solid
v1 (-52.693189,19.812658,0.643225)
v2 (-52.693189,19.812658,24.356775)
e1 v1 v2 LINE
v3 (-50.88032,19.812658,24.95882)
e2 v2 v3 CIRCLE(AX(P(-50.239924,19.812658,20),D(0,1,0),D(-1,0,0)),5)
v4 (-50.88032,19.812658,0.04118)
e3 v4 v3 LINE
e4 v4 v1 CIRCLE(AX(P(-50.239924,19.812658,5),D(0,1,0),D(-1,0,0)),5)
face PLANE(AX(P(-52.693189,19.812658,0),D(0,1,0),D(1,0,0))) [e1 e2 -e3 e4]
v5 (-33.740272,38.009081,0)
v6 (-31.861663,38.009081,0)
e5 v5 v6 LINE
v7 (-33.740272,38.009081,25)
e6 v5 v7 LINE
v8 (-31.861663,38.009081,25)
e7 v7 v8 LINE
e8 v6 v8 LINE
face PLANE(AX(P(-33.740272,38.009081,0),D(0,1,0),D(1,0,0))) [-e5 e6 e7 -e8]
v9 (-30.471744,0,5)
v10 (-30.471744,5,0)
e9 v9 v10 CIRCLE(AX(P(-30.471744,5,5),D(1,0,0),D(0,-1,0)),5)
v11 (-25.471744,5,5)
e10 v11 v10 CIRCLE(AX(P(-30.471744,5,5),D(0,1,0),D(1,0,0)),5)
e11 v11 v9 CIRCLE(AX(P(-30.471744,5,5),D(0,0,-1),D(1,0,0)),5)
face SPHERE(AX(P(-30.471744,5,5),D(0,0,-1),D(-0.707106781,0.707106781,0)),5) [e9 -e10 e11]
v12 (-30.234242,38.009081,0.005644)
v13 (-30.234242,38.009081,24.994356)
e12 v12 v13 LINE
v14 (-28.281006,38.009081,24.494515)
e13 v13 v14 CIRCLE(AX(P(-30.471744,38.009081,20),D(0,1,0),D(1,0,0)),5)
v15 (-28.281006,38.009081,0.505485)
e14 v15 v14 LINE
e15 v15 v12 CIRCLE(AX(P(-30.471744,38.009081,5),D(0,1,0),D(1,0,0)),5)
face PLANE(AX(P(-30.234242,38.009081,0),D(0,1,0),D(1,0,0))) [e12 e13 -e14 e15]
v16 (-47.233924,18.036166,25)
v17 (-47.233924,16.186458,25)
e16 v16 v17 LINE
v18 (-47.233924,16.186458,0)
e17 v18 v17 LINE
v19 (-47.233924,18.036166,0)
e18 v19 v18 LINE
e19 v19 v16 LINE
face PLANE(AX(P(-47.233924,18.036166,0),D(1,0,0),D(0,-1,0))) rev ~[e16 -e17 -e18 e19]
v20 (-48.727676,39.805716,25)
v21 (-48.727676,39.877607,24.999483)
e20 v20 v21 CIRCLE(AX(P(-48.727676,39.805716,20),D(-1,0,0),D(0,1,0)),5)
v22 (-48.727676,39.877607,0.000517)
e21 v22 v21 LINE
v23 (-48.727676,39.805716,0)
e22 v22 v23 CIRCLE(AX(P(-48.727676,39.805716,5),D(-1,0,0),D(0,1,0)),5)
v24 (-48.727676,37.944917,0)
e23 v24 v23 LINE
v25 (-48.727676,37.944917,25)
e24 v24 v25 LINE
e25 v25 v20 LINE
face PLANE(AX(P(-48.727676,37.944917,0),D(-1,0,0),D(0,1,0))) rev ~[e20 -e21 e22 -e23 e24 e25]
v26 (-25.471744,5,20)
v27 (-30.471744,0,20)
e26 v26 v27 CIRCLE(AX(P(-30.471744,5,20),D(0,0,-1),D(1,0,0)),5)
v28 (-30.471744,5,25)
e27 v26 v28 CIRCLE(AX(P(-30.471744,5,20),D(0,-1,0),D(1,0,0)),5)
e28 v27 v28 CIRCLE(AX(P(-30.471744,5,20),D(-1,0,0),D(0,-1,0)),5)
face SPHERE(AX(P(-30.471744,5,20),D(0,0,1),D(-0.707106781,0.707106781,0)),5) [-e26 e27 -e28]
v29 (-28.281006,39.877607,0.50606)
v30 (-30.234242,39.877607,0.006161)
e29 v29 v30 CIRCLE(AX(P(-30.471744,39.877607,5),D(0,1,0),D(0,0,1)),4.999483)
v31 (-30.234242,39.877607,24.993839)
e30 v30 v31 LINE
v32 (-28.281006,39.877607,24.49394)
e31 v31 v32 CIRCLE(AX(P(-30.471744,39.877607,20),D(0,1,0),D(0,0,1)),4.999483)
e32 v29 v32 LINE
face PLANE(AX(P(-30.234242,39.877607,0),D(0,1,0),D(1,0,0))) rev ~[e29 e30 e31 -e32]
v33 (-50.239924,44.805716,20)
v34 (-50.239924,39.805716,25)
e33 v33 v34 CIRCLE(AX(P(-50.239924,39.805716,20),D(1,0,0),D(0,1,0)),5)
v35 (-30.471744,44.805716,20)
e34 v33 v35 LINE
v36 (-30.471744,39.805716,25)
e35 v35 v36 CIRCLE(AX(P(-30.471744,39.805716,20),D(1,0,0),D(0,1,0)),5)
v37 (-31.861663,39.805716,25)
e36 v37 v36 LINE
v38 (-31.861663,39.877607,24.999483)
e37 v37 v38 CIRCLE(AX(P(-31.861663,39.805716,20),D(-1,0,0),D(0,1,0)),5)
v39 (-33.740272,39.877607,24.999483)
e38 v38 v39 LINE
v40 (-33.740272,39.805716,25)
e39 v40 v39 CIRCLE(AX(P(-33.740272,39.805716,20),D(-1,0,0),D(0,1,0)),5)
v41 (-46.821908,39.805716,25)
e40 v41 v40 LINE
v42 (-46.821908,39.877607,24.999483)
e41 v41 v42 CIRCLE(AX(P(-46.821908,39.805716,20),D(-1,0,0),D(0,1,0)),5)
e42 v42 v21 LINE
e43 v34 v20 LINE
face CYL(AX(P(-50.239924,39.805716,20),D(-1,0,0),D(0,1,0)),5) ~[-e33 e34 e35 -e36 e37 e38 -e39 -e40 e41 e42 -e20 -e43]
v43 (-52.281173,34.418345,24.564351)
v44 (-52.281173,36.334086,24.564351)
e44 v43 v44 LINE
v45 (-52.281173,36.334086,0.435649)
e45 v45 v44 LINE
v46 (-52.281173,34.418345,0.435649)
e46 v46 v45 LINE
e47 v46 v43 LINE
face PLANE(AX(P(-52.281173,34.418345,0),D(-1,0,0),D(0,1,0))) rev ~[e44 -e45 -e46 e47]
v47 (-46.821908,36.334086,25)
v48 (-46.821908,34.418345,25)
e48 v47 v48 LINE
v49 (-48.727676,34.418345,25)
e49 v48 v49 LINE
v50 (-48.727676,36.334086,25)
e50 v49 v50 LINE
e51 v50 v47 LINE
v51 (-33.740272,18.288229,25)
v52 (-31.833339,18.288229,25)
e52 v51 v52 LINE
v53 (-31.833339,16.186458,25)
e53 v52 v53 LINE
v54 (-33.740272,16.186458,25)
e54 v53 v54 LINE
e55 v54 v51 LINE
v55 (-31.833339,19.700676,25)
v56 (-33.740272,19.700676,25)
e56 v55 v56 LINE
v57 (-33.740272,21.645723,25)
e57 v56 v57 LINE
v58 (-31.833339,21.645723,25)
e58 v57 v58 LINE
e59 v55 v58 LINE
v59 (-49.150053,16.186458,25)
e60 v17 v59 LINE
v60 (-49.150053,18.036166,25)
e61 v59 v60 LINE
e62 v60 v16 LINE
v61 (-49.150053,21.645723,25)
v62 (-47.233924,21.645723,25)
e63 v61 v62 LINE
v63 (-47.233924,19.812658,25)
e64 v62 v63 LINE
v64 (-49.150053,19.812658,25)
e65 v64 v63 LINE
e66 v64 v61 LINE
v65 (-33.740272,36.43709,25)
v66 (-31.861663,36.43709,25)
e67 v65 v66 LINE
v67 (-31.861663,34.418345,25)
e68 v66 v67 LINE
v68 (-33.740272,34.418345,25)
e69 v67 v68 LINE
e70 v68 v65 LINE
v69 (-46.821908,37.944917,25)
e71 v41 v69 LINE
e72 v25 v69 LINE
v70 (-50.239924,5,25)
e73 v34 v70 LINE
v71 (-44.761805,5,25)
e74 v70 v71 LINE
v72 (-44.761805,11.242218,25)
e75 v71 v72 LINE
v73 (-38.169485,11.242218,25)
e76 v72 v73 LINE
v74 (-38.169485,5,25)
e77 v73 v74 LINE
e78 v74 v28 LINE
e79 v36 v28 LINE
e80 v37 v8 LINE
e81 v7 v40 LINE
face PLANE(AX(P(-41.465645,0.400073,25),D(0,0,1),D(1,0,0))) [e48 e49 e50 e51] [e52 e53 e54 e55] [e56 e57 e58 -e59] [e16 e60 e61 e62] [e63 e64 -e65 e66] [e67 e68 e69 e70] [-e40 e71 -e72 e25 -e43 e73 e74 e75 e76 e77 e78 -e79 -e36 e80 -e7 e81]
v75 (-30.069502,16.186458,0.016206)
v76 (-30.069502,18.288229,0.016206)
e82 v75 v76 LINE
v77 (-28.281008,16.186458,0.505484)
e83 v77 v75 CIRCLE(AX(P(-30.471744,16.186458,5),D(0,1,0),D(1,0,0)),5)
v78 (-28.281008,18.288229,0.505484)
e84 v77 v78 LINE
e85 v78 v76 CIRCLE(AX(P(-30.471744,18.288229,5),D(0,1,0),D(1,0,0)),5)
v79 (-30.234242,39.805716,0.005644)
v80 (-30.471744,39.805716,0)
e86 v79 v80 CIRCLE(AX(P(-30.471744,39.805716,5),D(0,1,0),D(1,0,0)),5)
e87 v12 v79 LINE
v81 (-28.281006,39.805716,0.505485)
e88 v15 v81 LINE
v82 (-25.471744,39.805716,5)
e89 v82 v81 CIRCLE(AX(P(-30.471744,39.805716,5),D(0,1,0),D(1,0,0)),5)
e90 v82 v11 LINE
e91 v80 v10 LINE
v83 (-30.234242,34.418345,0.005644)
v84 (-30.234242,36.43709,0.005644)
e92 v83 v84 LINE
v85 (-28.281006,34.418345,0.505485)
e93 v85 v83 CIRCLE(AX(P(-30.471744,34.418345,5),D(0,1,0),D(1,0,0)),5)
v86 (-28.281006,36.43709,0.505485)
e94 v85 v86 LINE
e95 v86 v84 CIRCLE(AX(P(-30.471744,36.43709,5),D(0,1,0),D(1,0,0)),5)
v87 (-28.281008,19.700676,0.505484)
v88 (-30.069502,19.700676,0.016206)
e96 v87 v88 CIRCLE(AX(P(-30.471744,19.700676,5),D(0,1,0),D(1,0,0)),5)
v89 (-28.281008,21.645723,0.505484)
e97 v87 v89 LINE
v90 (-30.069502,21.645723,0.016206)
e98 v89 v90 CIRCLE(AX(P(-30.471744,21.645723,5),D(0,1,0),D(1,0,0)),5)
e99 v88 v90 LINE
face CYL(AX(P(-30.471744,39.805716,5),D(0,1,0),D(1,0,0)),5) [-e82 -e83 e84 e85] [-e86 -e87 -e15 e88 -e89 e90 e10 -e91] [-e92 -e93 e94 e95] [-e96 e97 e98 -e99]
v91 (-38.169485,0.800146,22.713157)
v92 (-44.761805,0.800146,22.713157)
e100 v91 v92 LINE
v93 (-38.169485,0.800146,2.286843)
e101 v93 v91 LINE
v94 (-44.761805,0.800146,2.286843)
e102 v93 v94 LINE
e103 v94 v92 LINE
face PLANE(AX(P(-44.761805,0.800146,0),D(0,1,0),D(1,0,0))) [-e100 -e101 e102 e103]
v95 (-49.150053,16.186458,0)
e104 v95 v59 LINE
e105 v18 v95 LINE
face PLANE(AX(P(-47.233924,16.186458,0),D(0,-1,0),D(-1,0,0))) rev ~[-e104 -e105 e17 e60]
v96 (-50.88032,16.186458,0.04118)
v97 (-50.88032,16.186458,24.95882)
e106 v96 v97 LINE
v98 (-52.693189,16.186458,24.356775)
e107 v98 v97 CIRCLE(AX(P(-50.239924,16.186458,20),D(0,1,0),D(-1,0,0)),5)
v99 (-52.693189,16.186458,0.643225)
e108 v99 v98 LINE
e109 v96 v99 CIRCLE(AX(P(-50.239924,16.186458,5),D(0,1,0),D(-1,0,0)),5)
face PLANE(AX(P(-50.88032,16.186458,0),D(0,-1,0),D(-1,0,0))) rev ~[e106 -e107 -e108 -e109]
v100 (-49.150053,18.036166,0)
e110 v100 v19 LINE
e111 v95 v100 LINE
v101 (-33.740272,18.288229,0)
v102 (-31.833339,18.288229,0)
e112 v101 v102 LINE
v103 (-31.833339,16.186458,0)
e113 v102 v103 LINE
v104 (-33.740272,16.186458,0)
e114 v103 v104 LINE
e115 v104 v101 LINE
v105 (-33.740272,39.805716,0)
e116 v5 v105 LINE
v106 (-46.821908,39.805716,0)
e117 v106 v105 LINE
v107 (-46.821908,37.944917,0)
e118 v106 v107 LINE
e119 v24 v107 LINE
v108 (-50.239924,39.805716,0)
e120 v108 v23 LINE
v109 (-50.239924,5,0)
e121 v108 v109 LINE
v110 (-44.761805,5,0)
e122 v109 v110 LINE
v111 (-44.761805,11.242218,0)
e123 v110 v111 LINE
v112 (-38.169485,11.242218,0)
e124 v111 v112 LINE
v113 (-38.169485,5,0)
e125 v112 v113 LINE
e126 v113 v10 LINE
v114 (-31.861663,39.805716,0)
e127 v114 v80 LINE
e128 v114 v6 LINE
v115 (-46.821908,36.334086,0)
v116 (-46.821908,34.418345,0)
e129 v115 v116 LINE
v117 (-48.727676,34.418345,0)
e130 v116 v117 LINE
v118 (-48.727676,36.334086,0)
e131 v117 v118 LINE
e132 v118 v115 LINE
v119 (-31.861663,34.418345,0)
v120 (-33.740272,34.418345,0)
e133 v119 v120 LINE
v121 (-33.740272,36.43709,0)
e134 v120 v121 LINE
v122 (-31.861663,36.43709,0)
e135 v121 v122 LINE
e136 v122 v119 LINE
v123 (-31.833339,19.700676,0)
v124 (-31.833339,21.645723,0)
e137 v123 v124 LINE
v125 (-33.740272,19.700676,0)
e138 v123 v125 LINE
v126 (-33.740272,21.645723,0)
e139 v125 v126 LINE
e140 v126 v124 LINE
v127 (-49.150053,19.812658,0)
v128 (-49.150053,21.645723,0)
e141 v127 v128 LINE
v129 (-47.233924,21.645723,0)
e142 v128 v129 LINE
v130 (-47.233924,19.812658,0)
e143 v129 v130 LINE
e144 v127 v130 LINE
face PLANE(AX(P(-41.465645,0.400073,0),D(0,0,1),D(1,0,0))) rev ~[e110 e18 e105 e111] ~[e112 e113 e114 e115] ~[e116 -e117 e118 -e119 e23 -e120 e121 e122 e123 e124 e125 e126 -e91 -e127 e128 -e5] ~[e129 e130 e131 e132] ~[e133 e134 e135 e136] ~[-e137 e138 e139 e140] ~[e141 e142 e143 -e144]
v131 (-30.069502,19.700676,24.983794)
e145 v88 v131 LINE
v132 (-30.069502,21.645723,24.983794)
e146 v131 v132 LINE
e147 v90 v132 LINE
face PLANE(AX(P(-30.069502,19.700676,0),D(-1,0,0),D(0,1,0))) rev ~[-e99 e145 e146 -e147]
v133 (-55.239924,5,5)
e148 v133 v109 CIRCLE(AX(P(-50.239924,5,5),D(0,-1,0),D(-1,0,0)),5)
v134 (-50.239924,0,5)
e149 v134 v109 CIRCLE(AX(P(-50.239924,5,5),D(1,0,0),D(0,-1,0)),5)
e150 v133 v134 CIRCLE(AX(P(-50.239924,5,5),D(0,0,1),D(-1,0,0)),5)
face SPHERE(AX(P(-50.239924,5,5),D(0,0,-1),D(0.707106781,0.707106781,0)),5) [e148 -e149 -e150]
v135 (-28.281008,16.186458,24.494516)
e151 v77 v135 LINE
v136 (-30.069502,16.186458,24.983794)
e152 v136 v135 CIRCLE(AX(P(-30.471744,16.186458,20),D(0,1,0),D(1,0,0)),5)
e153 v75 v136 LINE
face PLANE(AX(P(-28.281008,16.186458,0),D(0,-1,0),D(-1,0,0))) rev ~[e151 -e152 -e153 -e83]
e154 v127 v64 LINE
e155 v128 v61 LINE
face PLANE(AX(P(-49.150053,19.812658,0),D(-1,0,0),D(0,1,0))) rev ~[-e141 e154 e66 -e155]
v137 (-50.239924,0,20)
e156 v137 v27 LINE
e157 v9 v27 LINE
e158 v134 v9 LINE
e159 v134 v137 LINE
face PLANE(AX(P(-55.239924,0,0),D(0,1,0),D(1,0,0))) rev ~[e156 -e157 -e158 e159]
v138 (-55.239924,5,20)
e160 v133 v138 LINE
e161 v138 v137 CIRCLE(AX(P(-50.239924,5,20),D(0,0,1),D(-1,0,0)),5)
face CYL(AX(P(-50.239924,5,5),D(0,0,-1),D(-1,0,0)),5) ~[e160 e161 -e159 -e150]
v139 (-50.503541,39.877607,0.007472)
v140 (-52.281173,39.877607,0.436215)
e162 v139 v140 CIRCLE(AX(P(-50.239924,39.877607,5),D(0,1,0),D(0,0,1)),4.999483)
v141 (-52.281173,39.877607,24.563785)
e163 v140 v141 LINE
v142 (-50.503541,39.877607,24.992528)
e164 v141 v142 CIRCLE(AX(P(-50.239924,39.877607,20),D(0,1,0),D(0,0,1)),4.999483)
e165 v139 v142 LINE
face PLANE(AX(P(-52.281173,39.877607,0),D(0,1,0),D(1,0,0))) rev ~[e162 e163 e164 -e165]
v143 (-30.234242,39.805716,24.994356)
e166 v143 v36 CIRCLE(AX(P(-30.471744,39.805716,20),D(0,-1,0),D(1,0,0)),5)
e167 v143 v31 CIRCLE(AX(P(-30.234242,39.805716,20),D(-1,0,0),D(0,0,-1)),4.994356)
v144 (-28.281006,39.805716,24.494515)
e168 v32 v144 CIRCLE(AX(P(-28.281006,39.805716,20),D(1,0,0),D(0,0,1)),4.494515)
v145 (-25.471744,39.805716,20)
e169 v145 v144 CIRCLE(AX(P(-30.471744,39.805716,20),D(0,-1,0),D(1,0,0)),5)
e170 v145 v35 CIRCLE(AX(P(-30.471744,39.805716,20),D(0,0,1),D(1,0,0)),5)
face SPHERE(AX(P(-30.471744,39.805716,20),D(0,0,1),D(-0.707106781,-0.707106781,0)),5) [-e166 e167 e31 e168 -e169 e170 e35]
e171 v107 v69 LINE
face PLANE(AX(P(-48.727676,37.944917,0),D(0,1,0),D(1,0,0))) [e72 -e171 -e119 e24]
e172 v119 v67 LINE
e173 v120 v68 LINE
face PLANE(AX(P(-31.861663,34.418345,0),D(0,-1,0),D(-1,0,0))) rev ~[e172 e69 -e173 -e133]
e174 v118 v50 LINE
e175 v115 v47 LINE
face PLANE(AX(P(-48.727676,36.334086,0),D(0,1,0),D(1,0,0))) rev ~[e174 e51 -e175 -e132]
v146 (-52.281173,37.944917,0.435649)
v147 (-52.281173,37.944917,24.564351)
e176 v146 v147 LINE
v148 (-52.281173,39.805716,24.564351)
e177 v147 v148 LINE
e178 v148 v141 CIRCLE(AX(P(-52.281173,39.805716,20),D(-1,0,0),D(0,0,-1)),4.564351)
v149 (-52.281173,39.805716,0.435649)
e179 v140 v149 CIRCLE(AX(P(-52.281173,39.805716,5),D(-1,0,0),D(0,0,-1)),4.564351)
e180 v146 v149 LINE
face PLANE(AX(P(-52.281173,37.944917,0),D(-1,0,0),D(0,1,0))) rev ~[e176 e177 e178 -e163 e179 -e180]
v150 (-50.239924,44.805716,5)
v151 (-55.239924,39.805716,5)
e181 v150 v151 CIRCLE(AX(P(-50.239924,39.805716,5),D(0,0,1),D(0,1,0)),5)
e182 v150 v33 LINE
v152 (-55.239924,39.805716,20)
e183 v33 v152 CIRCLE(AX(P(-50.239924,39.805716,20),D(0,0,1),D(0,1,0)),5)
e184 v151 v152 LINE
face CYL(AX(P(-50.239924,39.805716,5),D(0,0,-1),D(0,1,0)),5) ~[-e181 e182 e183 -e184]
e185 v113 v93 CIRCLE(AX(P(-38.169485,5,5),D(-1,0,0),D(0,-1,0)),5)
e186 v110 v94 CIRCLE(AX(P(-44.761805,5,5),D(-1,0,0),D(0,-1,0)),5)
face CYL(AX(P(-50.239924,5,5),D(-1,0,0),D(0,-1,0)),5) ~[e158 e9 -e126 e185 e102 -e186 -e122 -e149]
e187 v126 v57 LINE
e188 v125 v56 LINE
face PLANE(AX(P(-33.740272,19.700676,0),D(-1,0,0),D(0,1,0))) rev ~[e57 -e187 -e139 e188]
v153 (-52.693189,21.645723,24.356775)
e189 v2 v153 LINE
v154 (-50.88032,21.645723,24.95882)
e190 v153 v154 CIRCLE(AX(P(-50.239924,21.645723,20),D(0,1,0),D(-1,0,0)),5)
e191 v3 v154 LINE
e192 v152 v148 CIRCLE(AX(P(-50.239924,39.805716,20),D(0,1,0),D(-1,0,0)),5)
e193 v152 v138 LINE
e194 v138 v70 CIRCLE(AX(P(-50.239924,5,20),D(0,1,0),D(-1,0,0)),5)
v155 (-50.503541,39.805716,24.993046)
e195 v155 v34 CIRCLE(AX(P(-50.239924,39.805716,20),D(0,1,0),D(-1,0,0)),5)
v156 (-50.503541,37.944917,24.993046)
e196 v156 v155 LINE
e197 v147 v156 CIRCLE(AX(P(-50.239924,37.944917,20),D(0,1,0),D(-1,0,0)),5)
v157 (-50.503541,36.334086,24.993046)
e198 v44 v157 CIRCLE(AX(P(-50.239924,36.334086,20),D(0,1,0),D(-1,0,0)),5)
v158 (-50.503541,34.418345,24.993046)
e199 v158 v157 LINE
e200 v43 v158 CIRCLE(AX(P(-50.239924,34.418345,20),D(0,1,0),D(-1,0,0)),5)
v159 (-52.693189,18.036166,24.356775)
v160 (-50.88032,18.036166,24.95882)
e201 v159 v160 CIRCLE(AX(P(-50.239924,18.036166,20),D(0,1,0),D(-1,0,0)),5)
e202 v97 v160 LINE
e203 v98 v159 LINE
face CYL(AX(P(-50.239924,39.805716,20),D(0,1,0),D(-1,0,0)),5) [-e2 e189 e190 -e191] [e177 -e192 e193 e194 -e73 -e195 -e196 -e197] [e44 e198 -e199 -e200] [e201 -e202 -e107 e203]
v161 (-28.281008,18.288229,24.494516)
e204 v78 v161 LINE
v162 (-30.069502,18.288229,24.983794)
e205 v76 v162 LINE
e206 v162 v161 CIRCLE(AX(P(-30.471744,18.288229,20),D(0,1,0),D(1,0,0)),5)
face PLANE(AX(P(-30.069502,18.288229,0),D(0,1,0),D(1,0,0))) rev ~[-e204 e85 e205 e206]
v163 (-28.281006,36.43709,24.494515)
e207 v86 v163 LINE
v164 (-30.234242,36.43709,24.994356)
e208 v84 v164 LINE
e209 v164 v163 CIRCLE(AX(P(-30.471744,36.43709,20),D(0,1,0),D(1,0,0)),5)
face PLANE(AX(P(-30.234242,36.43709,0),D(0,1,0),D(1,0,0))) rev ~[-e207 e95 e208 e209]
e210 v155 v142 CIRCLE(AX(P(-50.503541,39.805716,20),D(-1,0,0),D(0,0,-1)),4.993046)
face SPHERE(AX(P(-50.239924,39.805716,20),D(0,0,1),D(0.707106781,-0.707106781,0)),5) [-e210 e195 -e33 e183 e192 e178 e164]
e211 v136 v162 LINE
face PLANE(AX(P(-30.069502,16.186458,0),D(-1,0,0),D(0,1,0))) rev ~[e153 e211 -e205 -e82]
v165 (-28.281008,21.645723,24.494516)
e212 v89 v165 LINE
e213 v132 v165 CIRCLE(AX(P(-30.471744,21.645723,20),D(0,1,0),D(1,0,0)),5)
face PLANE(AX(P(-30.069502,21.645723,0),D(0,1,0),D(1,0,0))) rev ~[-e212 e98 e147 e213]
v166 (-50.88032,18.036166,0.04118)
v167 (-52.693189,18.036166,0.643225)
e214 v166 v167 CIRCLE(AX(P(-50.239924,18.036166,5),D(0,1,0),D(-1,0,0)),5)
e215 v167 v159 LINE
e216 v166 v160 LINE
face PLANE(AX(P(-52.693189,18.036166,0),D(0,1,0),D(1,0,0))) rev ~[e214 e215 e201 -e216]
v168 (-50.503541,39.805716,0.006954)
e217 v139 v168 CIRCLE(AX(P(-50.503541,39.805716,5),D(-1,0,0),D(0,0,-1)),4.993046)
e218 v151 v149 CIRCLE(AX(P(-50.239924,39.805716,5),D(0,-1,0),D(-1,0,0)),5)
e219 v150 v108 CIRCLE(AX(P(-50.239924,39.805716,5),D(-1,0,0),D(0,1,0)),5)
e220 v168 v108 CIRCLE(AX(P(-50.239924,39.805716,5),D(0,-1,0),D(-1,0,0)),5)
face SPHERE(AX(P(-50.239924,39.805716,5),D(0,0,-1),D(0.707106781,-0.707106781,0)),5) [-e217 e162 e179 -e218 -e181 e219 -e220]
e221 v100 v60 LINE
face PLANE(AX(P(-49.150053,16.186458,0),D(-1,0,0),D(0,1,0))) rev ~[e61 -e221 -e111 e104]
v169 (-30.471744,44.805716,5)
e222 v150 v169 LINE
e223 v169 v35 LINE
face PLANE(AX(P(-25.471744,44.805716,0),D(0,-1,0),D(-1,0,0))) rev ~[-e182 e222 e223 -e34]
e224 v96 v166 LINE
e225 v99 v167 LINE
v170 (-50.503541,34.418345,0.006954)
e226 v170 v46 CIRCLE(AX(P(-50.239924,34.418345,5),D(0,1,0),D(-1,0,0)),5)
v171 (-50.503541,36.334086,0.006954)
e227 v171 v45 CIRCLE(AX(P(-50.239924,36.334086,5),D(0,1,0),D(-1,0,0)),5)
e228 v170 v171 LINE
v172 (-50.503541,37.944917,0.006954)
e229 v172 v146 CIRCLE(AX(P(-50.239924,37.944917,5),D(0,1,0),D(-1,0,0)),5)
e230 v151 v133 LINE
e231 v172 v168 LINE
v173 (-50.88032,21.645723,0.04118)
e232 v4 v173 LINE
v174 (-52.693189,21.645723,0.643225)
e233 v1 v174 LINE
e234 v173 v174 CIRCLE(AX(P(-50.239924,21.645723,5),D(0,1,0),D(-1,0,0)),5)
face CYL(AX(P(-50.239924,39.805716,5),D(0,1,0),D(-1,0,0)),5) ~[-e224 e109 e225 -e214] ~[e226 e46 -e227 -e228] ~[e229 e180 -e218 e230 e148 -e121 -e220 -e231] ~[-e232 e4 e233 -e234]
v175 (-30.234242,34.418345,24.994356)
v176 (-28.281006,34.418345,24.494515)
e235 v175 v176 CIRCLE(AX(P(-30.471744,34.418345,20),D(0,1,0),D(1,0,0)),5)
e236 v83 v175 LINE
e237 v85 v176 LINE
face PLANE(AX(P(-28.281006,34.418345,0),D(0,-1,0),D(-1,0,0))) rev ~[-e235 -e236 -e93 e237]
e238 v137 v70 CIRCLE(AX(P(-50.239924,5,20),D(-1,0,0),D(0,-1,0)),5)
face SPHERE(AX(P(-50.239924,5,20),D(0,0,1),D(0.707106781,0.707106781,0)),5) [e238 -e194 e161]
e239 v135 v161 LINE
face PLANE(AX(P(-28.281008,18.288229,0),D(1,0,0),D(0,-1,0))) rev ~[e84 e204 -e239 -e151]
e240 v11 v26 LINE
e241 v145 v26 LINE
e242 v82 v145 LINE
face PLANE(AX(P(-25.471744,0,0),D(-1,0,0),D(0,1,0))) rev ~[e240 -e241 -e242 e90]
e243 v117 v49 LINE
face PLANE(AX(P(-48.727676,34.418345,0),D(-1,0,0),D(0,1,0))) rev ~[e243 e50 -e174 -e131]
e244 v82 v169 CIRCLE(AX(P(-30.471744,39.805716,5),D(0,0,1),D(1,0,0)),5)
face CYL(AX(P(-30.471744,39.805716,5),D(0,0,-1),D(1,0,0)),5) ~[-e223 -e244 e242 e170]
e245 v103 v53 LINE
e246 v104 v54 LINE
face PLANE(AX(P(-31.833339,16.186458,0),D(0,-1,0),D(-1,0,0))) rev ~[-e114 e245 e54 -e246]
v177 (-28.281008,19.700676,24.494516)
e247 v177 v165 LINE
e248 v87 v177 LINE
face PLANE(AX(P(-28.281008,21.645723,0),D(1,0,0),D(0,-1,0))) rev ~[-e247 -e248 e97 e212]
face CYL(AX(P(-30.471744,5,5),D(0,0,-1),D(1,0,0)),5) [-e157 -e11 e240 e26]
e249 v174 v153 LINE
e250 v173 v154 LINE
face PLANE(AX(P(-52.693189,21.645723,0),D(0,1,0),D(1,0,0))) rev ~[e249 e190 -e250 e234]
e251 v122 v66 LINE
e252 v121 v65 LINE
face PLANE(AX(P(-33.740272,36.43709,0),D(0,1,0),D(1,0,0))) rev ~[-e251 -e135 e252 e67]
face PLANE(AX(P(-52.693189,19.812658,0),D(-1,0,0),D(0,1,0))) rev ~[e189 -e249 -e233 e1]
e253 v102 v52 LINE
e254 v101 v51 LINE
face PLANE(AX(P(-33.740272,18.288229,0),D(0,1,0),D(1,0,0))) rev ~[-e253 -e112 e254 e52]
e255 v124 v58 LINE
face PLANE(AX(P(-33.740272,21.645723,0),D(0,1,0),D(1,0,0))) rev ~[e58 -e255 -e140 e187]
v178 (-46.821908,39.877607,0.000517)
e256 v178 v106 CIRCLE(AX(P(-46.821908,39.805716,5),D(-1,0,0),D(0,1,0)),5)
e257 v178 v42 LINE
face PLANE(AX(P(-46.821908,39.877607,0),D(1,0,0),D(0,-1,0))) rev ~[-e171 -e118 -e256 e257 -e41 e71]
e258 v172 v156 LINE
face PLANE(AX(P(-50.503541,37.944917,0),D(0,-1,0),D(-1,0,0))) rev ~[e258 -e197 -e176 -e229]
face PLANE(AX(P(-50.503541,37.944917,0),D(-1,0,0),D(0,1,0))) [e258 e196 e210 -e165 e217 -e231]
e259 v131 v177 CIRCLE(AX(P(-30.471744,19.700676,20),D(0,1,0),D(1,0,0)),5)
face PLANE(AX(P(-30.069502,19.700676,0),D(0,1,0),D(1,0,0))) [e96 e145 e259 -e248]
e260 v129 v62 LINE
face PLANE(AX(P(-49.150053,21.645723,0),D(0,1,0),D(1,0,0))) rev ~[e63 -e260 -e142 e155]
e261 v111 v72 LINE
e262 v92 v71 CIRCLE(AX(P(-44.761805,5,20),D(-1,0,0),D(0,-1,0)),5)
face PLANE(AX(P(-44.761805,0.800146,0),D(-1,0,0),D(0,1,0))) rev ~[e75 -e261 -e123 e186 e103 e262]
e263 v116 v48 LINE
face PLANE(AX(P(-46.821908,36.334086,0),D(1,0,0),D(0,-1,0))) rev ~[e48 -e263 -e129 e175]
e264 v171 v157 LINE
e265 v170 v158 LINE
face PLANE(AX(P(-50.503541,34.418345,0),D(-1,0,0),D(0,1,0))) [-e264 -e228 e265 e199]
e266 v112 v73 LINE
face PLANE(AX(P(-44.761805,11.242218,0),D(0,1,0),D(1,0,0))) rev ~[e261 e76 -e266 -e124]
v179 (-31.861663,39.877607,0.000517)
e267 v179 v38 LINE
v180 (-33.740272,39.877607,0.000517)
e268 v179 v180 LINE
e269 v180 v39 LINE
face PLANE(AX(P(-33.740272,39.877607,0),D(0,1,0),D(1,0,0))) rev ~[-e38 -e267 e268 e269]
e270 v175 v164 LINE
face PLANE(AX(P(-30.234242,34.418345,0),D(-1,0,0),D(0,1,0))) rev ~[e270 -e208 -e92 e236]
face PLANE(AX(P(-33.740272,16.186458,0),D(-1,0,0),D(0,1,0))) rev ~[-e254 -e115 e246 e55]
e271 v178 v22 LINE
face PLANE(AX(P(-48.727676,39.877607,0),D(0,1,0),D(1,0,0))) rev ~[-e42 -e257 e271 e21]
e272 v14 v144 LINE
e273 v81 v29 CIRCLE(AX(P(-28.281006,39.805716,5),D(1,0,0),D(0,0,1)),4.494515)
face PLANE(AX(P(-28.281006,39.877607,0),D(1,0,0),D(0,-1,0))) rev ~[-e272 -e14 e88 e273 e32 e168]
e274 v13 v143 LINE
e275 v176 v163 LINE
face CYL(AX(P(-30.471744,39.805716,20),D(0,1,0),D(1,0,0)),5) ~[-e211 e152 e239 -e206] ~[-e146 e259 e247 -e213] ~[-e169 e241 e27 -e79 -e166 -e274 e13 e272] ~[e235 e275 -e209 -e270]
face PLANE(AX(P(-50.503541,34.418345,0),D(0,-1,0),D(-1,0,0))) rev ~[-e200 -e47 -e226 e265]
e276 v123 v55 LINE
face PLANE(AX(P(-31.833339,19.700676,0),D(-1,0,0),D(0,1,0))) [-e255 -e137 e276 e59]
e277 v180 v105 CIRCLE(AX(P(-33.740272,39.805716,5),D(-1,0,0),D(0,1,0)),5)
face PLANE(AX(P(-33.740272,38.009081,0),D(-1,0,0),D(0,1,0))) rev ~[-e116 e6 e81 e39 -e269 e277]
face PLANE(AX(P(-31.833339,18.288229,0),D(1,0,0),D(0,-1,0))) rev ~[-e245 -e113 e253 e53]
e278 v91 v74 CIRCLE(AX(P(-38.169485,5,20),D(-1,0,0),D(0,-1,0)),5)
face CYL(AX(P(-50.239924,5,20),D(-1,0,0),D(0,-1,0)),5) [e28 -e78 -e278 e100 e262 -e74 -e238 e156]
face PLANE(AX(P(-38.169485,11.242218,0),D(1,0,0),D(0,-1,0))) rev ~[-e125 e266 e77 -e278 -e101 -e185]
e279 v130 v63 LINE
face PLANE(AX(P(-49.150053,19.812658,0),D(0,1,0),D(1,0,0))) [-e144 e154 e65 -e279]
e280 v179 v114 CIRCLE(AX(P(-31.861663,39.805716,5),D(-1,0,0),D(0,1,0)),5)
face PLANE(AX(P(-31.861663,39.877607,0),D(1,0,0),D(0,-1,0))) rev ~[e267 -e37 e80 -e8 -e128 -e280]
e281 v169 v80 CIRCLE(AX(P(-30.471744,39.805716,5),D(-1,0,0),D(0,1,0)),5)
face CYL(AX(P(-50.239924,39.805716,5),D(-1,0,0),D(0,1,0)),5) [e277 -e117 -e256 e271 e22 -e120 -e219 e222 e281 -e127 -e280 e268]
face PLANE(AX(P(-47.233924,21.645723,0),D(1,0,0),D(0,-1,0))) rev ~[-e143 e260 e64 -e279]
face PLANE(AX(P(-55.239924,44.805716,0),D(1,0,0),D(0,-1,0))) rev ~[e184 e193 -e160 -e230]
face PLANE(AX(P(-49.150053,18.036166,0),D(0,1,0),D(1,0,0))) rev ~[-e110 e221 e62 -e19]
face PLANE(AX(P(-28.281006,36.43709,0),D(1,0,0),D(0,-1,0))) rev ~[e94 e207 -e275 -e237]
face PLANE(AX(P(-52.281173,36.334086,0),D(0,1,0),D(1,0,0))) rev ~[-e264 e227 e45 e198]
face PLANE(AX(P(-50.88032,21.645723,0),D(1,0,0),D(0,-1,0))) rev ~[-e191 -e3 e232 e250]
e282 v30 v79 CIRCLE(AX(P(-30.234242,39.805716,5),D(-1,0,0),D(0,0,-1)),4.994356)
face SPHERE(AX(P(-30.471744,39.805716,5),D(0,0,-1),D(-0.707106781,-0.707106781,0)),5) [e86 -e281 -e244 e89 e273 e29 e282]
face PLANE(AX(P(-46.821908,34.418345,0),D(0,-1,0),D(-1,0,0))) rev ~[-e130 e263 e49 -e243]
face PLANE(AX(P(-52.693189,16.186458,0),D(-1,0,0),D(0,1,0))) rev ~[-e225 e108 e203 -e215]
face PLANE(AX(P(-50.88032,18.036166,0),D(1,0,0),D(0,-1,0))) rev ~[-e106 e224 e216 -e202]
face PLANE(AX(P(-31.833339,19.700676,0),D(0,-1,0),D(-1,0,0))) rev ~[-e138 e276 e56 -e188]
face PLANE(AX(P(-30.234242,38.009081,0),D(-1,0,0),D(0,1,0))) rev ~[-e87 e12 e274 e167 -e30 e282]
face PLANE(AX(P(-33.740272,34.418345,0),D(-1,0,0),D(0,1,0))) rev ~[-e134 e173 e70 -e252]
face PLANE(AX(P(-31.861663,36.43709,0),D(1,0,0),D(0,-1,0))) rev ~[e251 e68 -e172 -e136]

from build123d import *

# Parameters (mm, degrees)
F0_W         = 6.5923197919
F0_H         = 0.8001455572
F0_W_2       = 1.763837412
F0_H_2       = 1.412447542
F0_H_3       = 2.101770214
F0_W_3       = 1.9069323985
F0_H_4       = 1.9450464989
F0_W_4       = 1.7884944444
F0_W_5       = 1.6274210066
F0_H_5       = 1.5719905496
F0_H_6       = 1.8685259757
F0_W_6       = 1.9532360649
F0_H_7       = 2.0187458968
F0_W_7       = 1.8786090163
F0_W_8       = 1.7776318862
F0_H_8       = 1.6108304262
F0_W_9       = 1.7758645117
F0_H_9       = 1.9326903758
F0_H_10      = 1.91574162
F0_W_10      = 1.905767857
F0_W_11      = 1.7302669585
F0_H_11      = 1.8497077592
F0_H_12      = 1.7764922231
F0_H_13      = 1.8330642725
F0_W_12      = 1.8128681632
F0_W_13      = 1.9161291332
F1_DEPTH     = 25
F2_T1_DEPTH  = 34.8057161443
F2_T3_DEPTH  = 15
F2_T5_DEPTH  = 19.7681800186
F2_S9_W      = 5
F2_S9_H      = 5
F2_T10_DEPTH = 5
F2_S15_W     = 5
F2_S15_H     = 5
F2_T16_DEPTH = 5
F2_S21_W     = 5
F2_S21_H     = 5
F2_T22_DEPTH = 5
F2_S27_W     = 5
F2_S27_H     = 5
F2_T28_DEPTH = 5
F2_S33_W     = 5
F2_S33_H     = 5
F2_T34_DEPTH = 5
F2_S39_W     = 5
F2_S39_H     = 5
F2_T40_DEPTH = 5
F2_S45_W     = 5
F2_S45_H     = 5
F2_T46_DEPTH = 5
F2_S51_W     = 5
F2_S51_H     = 5
F2_T52_DEPTH = 5


# Not quite as in the source:
# - a fillet or chamfer that OpenCascade refuses, or shapes differently, is made with other operations: its cross-section is extruded or revolved along the edge and cut away or added


with BuildPart() as f1:
    # F0 (on Top) → F1 (new body)
    with BuildSketch(Plane.XY):
        with Locations((-41.465645377, 0.4000727786)):
            Rectangle(F0_W, F0_H)
        Polygon((-25.4717437439, 44.8057161443), (-55.2399237625, 44.8057161443), (-55.2399237625, 0), (-44.761805273, 0), (-44.761805273, 0.8001455572), (-44.761805273, 11.2422176864), (-38.1694854811, 11.2422176864), (-38.1694854811, 0.8001455572), (-38.1694854811, 0), (-25.4717437439, 0), (-25.4717437439, 44.1919353443), align=None)
        Polygon((-52.6931885334, 19.8126584291), (-52.6931885334, 21.6457227017), (-50.8803203702, 21.6457227017), (-49.1500534117, 21.6457227017), (-47.2339242785, 21.6457227017), (-47.2339242785, 19.8126584291), (-47.2339242785, 18.036166206), (-47.2339242785, 16.1864584468), (-49.1500534117, 16.1864584468), (-50.8803203702, 16.1864584468), (-52.6931885334, 16.1864584468), (-52.6931885334, 18.036166206), align=None, mode=Mode.SUBTRACT)
        Polygon((-30.0695020705, 21.6457227017), (-28.2810076261, 21.6457227017), (-28.2810076261, 19.7006762028), (-28.2810076261, 18.2882286608), (-28.2810076261, 16.1864584468), (-30.0695020705, 16.1864584468), (-31.8333394825, 16.1864584468), (-33.740271881, 16.1864584468), (-33.740271881, 18.2882286608), (-33.740271881, 19.7006762028), (-33.740271881, 21.6457227017), (-31.8333394825, 21.6457227017), align=None, mode=Mode.SUBTRACT)
        Polygon((-52.2811726703, 37.9449166358), (-52.2811726703, 39.8776070116), (-50.5035407841, 39.8776070116), (-48.7276762724, 39.8776070116), (-46.8219084154, 39.8776070116), (-46.8219084154, 37.9449166358), (-46.8219084154, 36.3340862095), (-46.8219084154, 34.4183445895), (-48.7276762724, 34.4183445895), (-50.5035407841, 34.4183445895), (-52.2811726703, 34.4183445895), (-52.2811726703, 36.3340862095), align=None, mode=Mode.SUBTRACT)
        Polygon((-30.2342418581, 39.8776070116), (-28.2810057933, 39.8776070116), (-28.2810057933, 38.0090810359), (-28.2810057933, 36.4370904863), (-28.2810057933, 34.4183445895), (-30.2342418581, 34.4183445895), (-31.8616628647, 34.4183445895), (-33.740271881, 34.4183445895), (-33.740271881, 36.4370904863), (-33.740271881, 38.0090810359), (-33.740271881, 39.8776070116), (-31.8616628647, 39.8776070116), align=None, mode=Mode.SUBTRACT)
        with Locations((-30.9514207765, 18.9944524318)):
            Rectangle(F0_W_2, F0_H_2)
        with Locations((-30.9514207765, 17.2373435538)):
            Rectangle(F0_W_2, F0_H_3)
        with Locations((-32.7868056818, 18.9944524318)):
            Rectangle(F0_W_3, F0_H_2)
        with Locations((-30.9514207765, 20.6731994522)):
            Rectangle(F0_W_2, F0_H_4)
        with Locations((-29.1752548483, 18.9944524318)):
            Rectangle(F0_W_4, F0_H_2)
        with Locations((-31.0479523614, 37.2230857611)):
            Rectangle(F0_W_5, F0_H_5)
        with Locations((-31.0479523614, 38.9433440237)):
            Rectangle(F0_W_5, F0_H_6)
        with Locations((-29.2576238257, 37.2230857611)):
            Rectangle(F0_W_6, F0_H_5)
        with Locations((-31.0479523614, 35.4277175379)):
            Rectangle(F0_W_5, F0_H_7)
        with Locations((-32.8009673728, 37.2230857611)):
            Rectangle(F0_W_7, F0_H_5)
        with Locations((-51.3923567272, 37.1395014226)):
            Rectangle(F0_W_8, F0_H_8)
        with Locations((-49.6156085283, 37.1395014226)):
            Rectangle(F0_W_9, F0_H_8)
        with Locations((-49.6156085283, 38.9112618237)):
            Rectangle(F0_W_9, F0_H_9)
        with Locations((-49.6156085283, 35.3762153995)):
            Rectangle(F0_W_9, F0_H_10)
        with Locations((-47.7747923439, 37.1395014226)):
            Rectangle(F0_W_10, F0_H_8)
        with Locations((-50.015186891, 17.1113123264)):
            Rectangle(F0_W_11, F0_H_11)
        with Locations((-50.015186891, 18.9244123176)):
            Rectangle(F0_W_11, F0_H_12)
        with Locations((-50.015186891, 20.7291905654)):
            Rectangle(F0_W_11, F0_H_13)
        with Locations((-51.7867544518, 18.9244123176)):
            Rectangle(F0_W_12, F0_H_12)
        with Locations((-48.1919888451, 18.9244123176)):
            Rectangle(F0_W_13, F0_H_12)
    extrude(amount=F1_DEPTH)

    # F2: fillet of radius 5 on 12 edges, made by hand

    # F2_s2 → F2_t1 (cut)
    with BuildSketch(Plane.XZ.offset(-39.8057161443)):
        with BuildLine():
            ThreePointArc((-25.4717437439, 5), (-26.9362098379, 1.4644660941), (-30.4717437439, 0))
            Line((-30.4717437439, 0), (-25.4717437439, 0))
            Line((-25.4717437439, 0), (-25.4717437439, 5))
        make_face()
        with BuildLine():
            ThreePointArc((-25.4717437439, 20), (-26.9362098379, 23.5355339059), (-30.4717437439, 25))
            Line((-30.4717437439, 25), (-25.4717437439, 25))
            Line((-25.4717437439, 25), (-25.4717437439, 20))
        make_face()
        with BuildLine():
            ThreePointArc((-55.2399237625, 5), (-53.7754576684, 1.4644660941), (-50.2399237625, 0))
            Line((-50.2399237625, 0), (-55.2399237625, 0))
            Line((-55.2399237625, 0), (-55.2399237625, 5))
        make_face()
        with BuildLine():
            ThreePointArc((-55.2399237625, 20), (-53.7754576684, 23.5355339059), (-50.2399237625, 25))
            Line((-50.2399237625, 25), (-55.2399237625, 25))
            Line((-55.2399237625, 25), (-55.2399237625, 20))
        make_face()
    extrude(amount=F2_T1_DEPTH, mode=Mode.SUBTRACT)

    # F2_s4 → F2_t3 (cut)
    with BuildSketch(Plane.XY.offset(5)):
        with BuildLine():
            ThreePointArc((-25.4717437439, 39.8057161443), (-26.9362098379, 43.3412500502), (-30.4717437439, 44.8057161443))
            Line((-30.4717437439, 44.8057161443), (-25.4717437439, 44.8057161443))
            Line((-25.4717437439, 44.8057161443), (-25.4717437439, 39.8057161443))
        make_face()
        with BuildLine():
            ThreePointArc((-50.2399237625, 44.8057161443), (-53.7754576684, 43.3412500502), (-55.2399237625, 39.8057161443))
            Line((-55.2399237625, 39.8057161443), (-55.2399237625, 44.8057161443))
            Line((-55.2399237625, 44.8057161443), (-50.2399237625, 44.8057161443))
        make_face()
        with BuildLine():
            ThreePointArc((-55.2399237625, 5), (-53.7754576684, 1.4644660941), (-50.2399237625, 0))
            Line((-50.2399237625, 0), (-55.2399237625, 0))
            Line((-55.2399237625, 0), (-55.2399237625, 5))
        make_face()
        with BuildLine():
            ThreePointArc((-25.4717437439, 5), (-26.9362098379, 1.4644660941), (-30.4717437439, 0))
            Line((-30.4717437439, 0), (-25.4717437439, 0))
            Line((-25.4717437439, 0), (-25.4717437439, 5))
        make_face()
    extrude(amount=F2_T3_DEPTH, mode=Mode.SUBTRACT)

    # F2_s6 → F2_t5 (cut)
    with BuildSketch(Plane.YZ.offset(-50.2399237625)):
        with BuildLine():
            ThreePointArc((44.8057161443, 5), (43.3412500502, 1.4644660941), (39.8057161443, 0))
            Line((39.8057161443, 0), (44.8057161443, 0))
            Line((44.8057161443, 0), (44.8057161443, 5))
        make_face()
        with BuildLine():
            ThreePointArc((44.8057161443, 20), (43.3412500502, 23.5355339059), (39.8057161443, 25))
            Line((39.8057161443, 25), (44.8057161443, 25))
            Line((44.8057161443, 25), (44.8057161443, 20))
        make_face()
        with BuildLine():
            ThreePointArc((0, 20), (1.4644660941, 23.5355339059), (5, 25))
            Line((5, 25), (0, 25))
            Line((0, 25), (0, 20))
        make_face()
        with BuildLine():
            ThreePointArc((0, 5), (1.4644660941, 1.4644660941), (5, 0))
            Line((5, 0), (0, 0))
            Line((0, 0), (0, 5))
        make_face()
    extrude(amount=F2_T5_DEPTH, mode=Mode.SUBTRACT)


with BuildPart() as f2_tool8:
    # F2_s9 → F2_t10 (new body)
    with BuildSketch(Plane.XY.offset(5)):
        with Locations((-27.9717437439, 2.5)):
            Rectangle(F2_S9_W, F2_S9_H)
    extrude(amount=-F2_T10_DEPTH)

    # F2_s11 → F2_t12 (revolve, cut)
    with BuildSketch(Plane(origin=(-30.4717437439, 5, 5), x_dir=(-0.7071067812, 0.7071067812, 0), z_dir=(-0.7071067812, -0.7071067812, 0))):
        with BuildLine():
            ThreePointArc((0, -5), (5, 0), (0, 5))
            Line((0, 5), (0, -5))
        make_face()
    revolve(axis=Axis((-30.4717437439, 5, 5), (0, 0, -1)), mode=Mode.SUBTRACT)


with BuildPart() as f1_1:
    add(f1.part)

    # F2_t7: cut F2_tool8
    add(f2_tool8.part, mode=Mode.SUBTRACT)


with BuildPart() as f2_tool14:
    # F2_s15 → F2_t16 (new body)
    with BuildSketch(Plane.XY.offset(5)):
        with Locations((-27.9717437439, 42.3057161443)):
            Rectangle(F2_S15_W, F2_S15_H)
    extrude(amount=-F2_T16_DEPTH)

    # F2_s17 → F2_t18 (revolve, cut)
    with BuildSketch(Plane(origin=(-30.4717437439, 39.8057161443, 5), x_dir=(-0.7071067812, -0.7071067812, 0), z_dir=(0.7071067812, -0.7071067812, 0))):
        with BuildLine():
            ThreePointArc((0, -5), (5, 0), (0, 5))
            Line((0, 5), (0, -5))
        make_face()
    revolve(axis=Axis((-30.4717437439, 39.8057161443, 5), (0, 0, -1)), mode=Mode.SUBTRACT)


with BuildPart() as f1_2:
    add(f1_1.part)

    # F2_t13: cut F2_tool14
    add(f2_tool14.part, mode=Mode.SUBTRACT)


with BuildPart() as f2_tool20:
    # F2_s21 → F2_t22 (new body)
    with BuildSketch(Plane.XY.offset(20)):
        with Locations((-27.9717437439, 42.3057161443)):
            Rectangle(F2_S21_W, F2_S21_H)
    extrude(amount=F2_T22_DEPTH)

    # F2_s23 → F2_t24 (revolve, cut)
    with BuildSketch(Plane(origin=(-30.4717437439, 39.8057161443, 20), x_dir=(-0.7071067812, -0.7071067812, 0), z_dir=(-0.7071067812, 0.7071067812, 0))):
        with BuildLine():
            ThreePointArc((0, -5), (5, 0), (0, 5))
            Line((0, 5), (0, -5))
        make_face()
    revolve(axis=Axis((-30.4717437439, 39.8057161443, 20), (0, 0, 1)), mode=Mode.SUBTRACT)


with BuildPart() as f1_3:
    add(f1_2.part)

    # F2_t19: cut F2_tool20
    add(f2_tool20.part, mode=Mode.SUBTRACT)


with BuildPart() as f2_tool26:
    # F2_s27 → F2_t28 (new body)
    with BuildSketch(Plane.XY.offset(20)):
        with Locations((-27.9717437439, 2.5)):
            Rectangle(F2_S27_W, F2_S27_H)
    extrude(amount=F2_T28_DEPTH)

    # F2_s29 → F2_t30 (revolve, cut)
    with BuildSketch(Plane(origin=(-30.4717437439, 5, 20), x_dir=(-0.7071067812, 0.7071067812, 0), z_dir=(0.7071067812, 0.7071067812, 0))):
        with BuildLine():
            ThreePointArc((0, -5), (5, 0), (0, 5))
            Line((0, 5), (0, -5))
        make_face()
    revolve(axis=Axis((-30.4717437439, 5, 20), (0, 0, 1)), mode=Mode.SUBTRACT)


with BuildPart() as f1_4:
    add(f1_3.part)

    # F2_t25: cut F2_tool26
    add(f2_tool26.part, mode=Mode.SUBTRACT)


with BuildPart() as f2_tool32:
    # F2_s33 → F2_t34 (new body)
    with BuildSketch(Plane.XY.offset(5)):
        with Locations((-52.7399237625, 42.3057161443)):
            Rectangle(F2_S33_W, F2_S33_H)
    extrude(amount=-F2_T34_DEPTH)

    # F2_s35 → F2_t36 (revolve, cut)
    with BuildSketch(Plane(origin=(-50.2399237625, 39.8057161443, 5), x_dir=(0.7071067812, -0.7071067812, 0), z_dir=(0.7071067812, 0.7071067812, 0))):
        with BuildLine():
            ThreePointArc((0, -5), (5, 0), (0, 5))
            Line((0, 5), (0, -5))
        make_face()
    revolve(axis=Axis((-50.2399237625, 39.8057161443, 5), (0, 0, -1)), mode=Mode.SUBTRACT)


with BuildPart() as f1_5:
    add(f1_4.part)

    # F2_t31: cut F2_tool32
    add(f2_tool32.part, mode=Mode.SUBTRACT)


with BuildPart() as f2_tool38:
    # F2_s39 → F2_t40 (new body)
    with BuildSketch(Plane.XY.offset(5)):
        with Locations((-52.7399237625, 2.5)):
            Rectangle(F2_S39_W, F2_S39_H)
    extrude(amount=-F2_T40_DEPTH)

    # F2_s41 → F2_t42 (revolve, cut)
    with BuildSketch(Plane(origin=(-50.2399237625, 5, 5), x_dir=(0.7071067812, 0.7071067812, 0), z_dir=(-0.7071067812, 0.7071067812, 0))):
        with BuildLine():
            ThreePointArc((0, -5), (5, 0), (0, 5))
            Line((0, 5), (0, -5))
        make_face()
    revolve(axis=Axis((-50.2399237625, 5, 5), (0, 0, -1)), mode=Mode.SUBTRACT)


with BuildPart() as f1_6:
    add(f1_5.part)

    # F2_t37: cut F2_tool38
    add(f2_tool38.part, mode=Mode.SUBTRACT)


with BuildPart() as f2_tool44:
    # F2_s45 → F2_t46 (new body)
    with BuildSketch(Plane.XY.offset(20)):
        with Locations((-52.7399237625, 42.3057161443)):
            Rectangle(F2_S45_W, F2_S45_H)
    extrude(amount=F2_T46_DEPTH)

    # F2_s47 → F2_t48 (revolve, cut)
    with BuildSketch(Plane(origin=(-50.2399237625, 39.8057161443, 20), x_dir=(0.7071067812, -0.7071067812, 0), z_dir=(-0.7071067812, -0.7071067812, 0))):
        with BuildLine():
            ThreePointArc((0, -5), (5, 0), (0, 5))
            Line((0, 5), (0, -5))
        make_face()
    revolve(axis=Axis((-50.2399237625, 39.8057161443, 20), (0, 0, 1)), mode=Mode.SUBTRACT)


with BuildPart() as f1_7:
    add(f1_6.part)

    # F2_t43: cut F2_tool44
    add(f2_tool44.part, mode=Mode.SUBTRACT)


with BuildPart() as f2_tool50:
    # F2_s51 → F2_t52 (new body)
    with BuildSketch(Plane.XY.offset(20)):
        with Locations((-52.7399237625, 2.5)):
            Rectangle(F2_S51_W, F2_S51_H)
    extrude(amount=F2_T52_DEPTH)

    # F2_s53 → F2_t54 (revolve, cut)
    with BuildSketch(Plane(origin=(-50.2399237625, 5, 20), x_dir=(0.7071067812, 0.7071067812, 0), z_dir=(0.7071067812, -0.7071067812, 0))):
        with BuildLine():
            ThreePointArc((0, -5), (5, 0), (0, 5))
            Line((0, 5), (0, -5))
        make_face()
    revolve(axis=Axis((-50.2399237625, 5, 20), (0, 0, 1)), mode=Mode.SUBTRACT)


with BuildPart() as f1_8:
    add(f1_7.part)

    # F2_t49: cut F2_tool50
    add(f2_tool50.part, mode=Mode.SUBTRACT)


solid = f1_8.part
